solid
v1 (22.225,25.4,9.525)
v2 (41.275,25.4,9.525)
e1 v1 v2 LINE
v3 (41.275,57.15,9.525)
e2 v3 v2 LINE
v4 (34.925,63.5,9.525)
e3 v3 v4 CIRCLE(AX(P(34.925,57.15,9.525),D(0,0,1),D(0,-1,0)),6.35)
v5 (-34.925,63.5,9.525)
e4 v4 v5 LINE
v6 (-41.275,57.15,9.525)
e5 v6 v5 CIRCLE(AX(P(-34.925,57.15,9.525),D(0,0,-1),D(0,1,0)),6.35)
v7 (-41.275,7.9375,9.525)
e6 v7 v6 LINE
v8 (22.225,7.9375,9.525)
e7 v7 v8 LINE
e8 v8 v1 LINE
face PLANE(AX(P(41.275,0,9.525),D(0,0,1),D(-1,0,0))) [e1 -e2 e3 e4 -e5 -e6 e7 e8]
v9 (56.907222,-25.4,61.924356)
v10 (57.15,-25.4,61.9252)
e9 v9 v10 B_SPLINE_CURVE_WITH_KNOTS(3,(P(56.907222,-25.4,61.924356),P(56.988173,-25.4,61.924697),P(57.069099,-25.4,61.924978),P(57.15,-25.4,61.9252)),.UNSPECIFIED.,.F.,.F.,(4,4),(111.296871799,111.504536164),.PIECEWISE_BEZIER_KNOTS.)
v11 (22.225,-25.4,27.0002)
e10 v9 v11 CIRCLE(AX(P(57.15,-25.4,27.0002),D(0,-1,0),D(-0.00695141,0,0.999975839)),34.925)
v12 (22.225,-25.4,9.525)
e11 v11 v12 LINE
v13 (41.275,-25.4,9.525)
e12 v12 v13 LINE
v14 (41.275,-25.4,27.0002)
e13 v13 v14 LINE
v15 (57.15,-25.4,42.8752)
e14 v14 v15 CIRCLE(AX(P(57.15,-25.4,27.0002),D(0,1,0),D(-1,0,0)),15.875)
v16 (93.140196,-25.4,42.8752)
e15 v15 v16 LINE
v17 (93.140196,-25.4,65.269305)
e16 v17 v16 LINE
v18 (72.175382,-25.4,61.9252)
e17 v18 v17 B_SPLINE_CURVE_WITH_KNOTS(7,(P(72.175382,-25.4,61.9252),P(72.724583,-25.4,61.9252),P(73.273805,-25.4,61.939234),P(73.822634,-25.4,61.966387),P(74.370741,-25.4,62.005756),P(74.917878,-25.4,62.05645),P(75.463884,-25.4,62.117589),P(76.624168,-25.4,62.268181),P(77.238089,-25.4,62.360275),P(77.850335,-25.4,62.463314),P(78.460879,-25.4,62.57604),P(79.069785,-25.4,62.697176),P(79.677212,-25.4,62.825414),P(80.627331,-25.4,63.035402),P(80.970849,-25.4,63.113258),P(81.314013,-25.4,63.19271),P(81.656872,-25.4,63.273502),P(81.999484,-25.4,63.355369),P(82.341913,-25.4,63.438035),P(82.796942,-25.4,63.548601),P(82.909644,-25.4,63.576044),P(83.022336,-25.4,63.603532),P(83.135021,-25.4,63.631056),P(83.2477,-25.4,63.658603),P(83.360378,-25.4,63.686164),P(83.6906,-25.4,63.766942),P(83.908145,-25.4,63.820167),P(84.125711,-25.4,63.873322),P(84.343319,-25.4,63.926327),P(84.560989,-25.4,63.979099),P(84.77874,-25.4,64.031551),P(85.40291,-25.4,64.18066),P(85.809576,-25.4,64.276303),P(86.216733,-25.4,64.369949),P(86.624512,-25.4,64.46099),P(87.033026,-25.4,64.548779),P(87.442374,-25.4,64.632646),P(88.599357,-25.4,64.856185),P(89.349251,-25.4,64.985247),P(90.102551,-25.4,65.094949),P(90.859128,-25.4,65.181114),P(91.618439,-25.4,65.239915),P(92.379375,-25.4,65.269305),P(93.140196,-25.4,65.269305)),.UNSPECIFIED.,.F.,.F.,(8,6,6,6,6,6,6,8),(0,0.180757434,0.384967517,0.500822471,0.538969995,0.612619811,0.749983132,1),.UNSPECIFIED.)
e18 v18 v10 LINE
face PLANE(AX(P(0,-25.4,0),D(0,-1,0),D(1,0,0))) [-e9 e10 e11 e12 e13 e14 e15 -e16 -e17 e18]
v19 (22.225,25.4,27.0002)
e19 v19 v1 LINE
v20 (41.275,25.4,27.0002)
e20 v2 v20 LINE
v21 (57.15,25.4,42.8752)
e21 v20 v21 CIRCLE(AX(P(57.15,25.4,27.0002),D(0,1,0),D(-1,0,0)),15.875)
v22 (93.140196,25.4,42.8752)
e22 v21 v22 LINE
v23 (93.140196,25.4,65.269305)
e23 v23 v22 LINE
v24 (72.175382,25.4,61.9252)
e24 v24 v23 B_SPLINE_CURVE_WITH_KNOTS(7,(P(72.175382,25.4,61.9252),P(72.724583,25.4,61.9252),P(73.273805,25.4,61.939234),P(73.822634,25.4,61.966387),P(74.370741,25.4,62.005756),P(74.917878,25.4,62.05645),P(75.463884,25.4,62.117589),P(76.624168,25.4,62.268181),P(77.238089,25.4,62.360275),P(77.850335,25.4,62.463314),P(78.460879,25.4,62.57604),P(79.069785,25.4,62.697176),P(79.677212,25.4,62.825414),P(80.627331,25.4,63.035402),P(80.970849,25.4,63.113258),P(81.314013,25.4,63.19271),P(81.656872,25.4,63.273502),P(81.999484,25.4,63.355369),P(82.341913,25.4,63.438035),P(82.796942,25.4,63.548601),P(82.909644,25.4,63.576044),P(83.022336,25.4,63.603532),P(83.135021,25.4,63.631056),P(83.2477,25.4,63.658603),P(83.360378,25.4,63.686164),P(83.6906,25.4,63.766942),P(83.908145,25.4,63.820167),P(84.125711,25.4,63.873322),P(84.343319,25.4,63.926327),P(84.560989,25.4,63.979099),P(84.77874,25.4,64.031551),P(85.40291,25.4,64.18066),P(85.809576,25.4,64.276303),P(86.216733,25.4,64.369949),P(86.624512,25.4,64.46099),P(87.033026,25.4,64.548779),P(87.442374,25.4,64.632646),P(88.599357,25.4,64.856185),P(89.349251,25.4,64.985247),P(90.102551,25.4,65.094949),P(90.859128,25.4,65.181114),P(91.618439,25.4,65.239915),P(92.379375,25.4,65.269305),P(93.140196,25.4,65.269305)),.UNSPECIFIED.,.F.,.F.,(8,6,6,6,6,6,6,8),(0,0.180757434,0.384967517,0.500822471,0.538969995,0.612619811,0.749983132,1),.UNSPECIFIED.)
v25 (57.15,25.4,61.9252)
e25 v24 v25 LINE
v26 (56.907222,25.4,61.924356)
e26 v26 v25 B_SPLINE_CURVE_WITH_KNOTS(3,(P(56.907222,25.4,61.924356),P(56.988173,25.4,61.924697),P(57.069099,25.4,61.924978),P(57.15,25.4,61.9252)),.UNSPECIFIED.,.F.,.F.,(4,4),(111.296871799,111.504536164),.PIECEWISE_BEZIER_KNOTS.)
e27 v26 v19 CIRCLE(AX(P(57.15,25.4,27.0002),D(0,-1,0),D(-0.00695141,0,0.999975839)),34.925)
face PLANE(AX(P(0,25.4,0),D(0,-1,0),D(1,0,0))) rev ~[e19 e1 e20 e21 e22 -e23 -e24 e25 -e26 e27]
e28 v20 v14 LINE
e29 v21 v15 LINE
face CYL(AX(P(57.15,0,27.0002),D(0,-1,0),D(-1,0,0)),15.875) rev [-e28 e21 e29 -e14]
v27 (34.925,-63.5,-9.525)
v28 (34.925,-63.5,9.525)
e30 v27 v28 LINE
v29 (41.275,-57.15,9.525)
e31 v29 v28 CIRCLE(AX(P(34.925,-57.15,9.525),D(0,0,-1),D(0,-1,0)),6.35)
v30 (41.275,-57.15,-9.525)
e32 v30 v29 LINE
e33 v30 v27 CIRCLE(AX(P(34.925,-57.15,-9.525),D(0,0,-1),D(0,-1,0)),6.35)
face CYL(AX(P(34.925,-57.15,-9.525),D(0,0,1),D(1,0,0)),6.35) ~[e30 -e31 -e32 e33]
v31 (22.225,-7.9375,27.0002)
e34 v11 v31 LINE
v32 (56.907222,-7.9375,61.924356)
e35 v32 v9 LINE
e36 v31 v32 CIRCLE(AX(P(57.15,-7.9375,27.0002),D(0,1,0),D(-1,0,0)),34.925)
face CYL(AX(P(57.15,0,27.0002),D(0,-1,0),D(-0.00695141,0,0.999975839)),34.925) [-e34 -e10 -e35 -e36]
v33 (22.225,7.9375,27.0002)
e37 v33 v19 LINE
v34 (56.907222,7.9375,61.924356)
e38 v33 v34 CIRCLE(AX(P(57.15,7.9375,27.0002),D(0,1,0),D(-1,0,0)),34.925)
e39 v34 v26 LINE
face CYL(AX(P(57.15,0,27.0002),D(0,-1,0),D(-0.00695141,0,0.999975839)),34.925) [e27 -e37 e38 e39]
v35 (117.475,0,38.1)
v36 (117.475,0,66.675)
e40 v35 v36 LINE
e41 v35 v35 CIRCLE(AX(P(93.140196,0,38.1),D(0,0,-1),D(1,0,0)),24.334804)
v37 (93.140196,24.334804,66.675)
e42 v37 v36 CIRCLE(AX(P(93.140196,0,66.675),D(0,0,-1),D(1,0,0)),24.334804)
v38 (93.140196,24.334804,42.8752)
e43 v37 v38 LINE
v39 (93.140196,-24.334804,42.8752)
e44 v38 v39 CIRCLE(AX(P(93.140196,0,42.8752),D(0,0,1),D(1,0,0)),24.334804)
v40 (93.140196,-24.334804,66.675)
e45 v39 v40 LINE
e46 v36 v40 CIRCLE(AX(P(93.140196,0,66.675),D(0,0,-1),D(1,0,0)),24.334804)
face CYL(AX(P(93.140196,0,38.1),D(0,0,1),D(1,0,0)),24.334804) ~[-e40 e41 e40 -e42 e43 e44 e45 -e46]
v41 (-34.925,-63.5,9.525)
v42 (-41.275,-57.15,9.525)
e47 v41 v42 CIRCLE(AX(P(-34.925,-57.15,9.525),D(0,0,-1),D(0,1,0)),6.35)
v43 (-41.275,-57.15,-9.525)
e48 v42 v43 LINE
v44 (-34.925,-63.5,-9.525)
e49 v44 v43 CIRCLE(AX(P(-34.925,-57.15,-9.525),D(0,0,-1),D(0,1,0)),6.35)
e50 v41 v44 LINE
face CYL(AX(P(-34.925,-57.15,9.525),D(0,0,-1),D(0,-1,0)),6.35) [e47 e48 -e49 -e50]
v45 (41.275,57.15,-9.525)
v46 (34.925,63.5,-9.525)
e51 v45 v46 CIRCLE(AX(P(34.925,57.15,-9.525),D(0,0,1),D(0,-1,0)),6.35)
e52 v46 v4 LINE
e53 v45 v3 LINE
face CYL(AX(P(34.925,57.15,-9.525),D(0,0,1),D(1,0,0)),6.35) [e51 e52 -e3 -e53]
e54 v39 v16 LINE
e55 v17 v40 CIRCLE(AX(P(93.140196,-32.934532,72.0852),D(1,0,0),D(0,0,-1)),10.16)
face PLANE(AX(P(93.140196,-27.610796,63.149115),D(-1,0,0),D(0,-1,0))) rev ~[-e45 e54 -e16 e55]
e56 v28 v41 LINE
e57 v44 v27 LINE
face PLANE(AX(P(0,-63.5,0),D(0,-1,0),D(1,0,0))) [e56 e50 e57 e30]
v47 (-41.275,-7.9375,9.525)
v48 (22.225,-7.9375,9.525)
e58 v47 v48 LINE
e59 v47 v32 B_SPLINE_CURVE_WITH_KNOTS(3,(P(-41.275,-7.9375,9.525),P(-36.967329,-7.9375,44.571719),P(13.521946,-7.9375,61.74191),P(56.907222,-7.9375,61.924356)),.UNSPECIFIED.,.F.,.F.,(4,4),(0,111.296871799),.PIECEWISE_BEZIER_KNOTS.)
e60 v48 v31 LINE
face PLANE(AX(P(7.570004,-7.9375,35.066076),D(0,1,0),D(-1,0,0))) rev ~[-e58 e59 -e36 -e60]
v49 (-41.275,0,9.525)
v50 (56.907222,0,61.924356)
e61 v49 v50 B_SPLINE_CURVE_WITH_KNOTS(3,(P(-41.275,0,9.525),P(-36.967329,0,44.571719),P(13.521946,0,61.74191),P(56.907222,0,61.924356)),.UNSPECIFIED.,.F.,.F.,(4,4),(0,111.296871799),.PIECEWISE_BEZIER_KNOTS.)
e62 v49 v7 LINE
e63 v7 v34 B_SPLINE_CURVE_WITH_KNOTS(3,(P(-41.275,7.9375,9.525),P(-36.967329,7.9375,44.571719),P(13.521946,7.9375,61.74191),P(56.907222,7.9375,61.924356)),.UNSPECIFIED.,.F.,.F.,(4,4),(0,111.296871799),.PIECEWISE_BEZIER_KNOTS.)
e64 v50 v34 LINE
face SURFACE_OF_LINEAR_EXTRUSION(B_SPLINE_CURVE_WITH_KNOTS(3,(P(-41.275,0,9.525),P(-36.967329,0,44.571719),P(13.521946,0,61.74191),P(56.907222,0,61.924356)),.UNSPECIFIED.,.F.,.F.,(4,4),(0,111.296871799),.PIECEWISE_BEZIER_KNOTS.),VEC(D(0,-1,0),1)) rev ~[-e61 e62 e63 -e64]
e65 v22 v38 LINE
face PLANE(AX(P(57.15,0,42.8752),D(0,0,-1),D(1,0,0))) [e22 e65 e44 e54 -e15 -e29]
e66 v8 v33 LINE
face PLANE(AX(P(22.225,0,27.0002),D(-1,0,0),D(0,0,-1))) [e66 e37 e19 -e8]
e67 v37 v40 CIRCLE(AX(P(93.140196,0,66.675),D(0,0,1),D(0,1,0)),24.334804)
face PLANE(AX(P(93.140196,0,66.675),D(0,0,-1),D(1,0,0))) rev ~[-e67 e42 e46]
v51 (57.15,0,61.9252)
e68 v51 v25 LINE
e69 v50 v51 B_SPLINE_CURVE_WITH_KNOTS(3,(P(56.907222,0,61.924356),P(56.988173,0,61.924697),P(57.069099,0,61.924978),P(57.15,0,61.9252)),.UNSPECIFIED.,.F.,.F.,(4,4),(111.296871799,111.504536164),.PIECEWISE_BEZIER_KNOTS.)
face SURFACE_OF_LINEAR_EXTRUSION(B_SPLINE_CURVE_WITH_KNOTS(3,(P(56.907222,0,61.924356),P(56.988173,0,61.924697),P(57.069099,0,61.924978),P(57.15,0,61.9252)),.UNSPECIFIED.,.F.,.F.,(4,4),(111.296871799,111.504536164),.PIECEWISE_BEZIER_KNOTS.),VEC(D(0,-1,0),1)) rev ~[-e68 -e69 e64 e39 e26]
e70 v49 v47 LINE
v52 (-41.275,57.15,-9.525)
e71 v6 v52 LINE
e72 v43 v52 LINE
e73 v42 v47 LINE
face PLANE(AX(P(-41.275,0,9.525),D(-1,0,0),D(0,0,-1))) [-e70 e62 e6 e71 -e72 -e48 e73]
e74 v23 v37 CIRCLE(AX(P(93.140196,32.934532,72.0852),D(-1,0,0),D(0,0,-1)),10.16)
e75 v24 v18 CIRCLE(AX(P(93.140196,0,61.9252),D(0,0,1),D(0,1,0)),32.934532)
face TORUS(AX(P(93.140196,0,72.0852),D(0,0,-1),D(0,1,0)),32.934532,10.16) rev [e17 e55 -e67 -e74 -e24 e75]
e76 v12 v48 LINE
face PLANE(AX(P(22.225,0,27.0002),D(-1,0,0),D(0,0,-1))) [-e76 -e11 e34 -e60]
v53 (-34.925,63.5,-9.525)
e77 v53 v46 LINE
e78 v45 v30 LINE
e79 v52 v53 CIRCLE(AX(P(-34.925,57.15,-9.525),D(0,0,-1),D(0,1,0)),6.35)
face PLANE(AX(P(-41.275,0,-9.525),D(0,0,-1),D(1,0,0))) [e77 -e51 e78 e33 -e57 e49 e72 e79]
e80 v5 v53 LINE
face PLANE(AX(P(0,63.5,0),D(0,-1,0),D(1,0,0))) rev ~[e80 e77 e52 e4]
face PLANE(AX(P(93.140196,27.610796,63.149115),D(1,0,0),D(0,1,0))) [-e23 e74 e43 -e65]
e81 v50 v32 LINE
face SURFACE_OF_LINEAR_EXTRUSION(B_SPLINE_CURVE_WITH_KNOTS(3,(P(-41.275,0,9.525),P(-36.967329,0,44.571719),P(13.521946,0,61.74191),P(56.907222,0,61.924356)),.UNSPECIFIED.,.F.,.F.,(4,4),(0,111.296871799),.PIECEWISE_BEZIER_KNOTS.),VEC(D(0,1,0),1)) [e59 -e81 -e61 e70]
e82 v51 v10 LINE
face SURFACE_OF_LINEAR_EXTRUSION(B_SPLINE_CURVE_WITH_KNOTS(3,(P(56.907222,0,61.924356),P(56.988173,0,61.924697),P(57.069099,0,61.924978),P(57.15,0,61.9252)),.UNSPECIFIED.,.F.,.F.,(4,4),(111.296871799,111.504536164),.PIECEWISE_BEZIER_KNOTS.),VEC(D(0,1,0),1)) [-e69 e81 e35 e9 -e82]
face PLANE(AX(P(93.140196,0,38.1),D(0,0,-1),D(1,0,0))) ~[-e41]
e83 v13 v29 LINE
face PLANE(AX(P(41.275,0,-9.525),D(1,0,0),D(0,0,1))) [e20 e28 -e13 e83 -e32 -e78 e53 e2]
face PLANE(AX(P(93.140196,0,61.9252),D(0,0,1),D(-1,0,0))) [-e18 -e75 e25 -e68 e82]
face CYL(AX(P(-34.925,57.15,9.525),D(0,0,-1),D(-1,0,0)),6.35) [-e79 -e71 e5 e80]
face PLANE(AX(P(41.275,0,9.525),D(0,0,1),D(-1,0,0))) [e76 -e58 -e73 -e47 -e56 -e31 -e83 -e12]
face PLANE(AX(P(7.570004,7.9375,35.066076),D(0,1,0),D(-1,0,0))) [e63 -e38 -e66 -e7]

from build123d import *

# Parameters (mm, degrees)
F1_DEPTH    = 63.5
F0_W        = 26.465196414
F0_H        = 19.05
F2_DEPTH    = 25.4
F3_DEPTH    = 7.9375
F5_R        = 6.35
F6_T4_ANGLE = 180


# Not quite as in the source:
# - a fillet or chamfer that OpenCascade refuses, or shapes differently, is made with other operations: its cross-section is extruded or revolved along the edge and cut away or added


with BuildPart() as f1:
    # F0 (on Front) → F1 (new body, symmetric)
    with BuildSketch(Plane.XZ):
        Polygon((-41.275, -9.525), (41.275, -9.525), (41.275, 9.525), (22.225, 9.525), (-41.275, 9.525), align=None)
    extrude(amount=F1_DEPTH, both=True)

    # F0 (on Front) → F2 (join, symmetric)
    with BuildSketch(Plane.XZ):
        with BuildLine():
            Line((22.225, 9.525), (41.275, 9.525))
            Line((41.275, 9.525), (41.275, 27.0002))
            ThreePointArc((41.275, 27.0002), (45.9246798487, 38.2255201513), (57.15, 42.8752))
            Line((57.15, 42.8752), (66.675, 42.8752))
            Line((66.675, 42.8752), (66.675, 61.9252))
            Line((66.675, 61.9252), (57.15, 61.9252))
            add(Edge.make_bspline(
                [(56.9072220114, 61.9243561652), (56.9881728551, 61.9246965832), (57.0690989666, 61.9249778596), (57.15, 61.9252)],
                knots=[111.2968717992, 111.2968717992, 111.2968717992, 111.2968717992, 111.5045361635, 111.5045361635, 111.5045361635, 111.5045361635], degree=3))
            ThreePointArc((56.9072220114, 61.9243561652), (32.3686093383, 51.6099196626), (22.225, 27.0002))
            Line((22.225, 27.0002), (22.225, 9.525))
        make_face()
        with Locations((79.907598207, 52.4002)):
            Rectangle(F0_W, F0_H)
    extrude(amount=F2_DEPTH, both=True)

    # F0 (on Front) → F3 (join, symmetric)
    with BuildSketch(Plane.XZ):
        with BuildLine():
            add(Edge.make_bspline(
                [(-41.275, 9.525), (-36.9673291938, 44.5717190185), (13.5219464317, 61.7419104925), (56.9072220114, 61.9243561652)],
                knots=[0, 0, 0, 0, 111.2968717992, 111.2968717992, 111.2968717992, 111.2968717992], degree=3))
            Line((-41.275, 9.525), (22.225, 9.525))
            Line((22.225, 9.525), (22.225, 27.0002))
            ThreePointArc((22.225, 27.0002), (32.3686093383, 51.6099196626), (56.9072220114, 61.9243561652))
        make_face()
    extrude(amount=F3_DEPTH, both=True)

    # F0 (on Front) → F4 (revolve)
    with BuildSketch(Plane.XZ):
        Polygon((93.140196414, 61.9252), (93.140196414, 42.8752), (93.140196414, 38.1), (117.475, 38.1), (117.475, 66.675), (93.140196414, 66.675), align=None)
    revolve(axis=Axis((93.140196414, 0, 52.3875), (0, 0, -1)))

    # F5
    f5_edges = [f1.edges().sort_by_distance(p)[0] for p in [
        (-41.275, 63.5, 0),
        (-41.275, -63.5, 0),
        (41.275, -63.5, 0),
        (41.275, 63.5, 0),
    ]]
    fillet(f5_edges, radius=F5_R)

    # F6: fillet of radius 10.16 on 1 edges, made by hand


with BuildPart() as f6_tool2:
    # F6_s3 → F6_t4 (revolve)
    with BuildSketch(Plane.YZ.offset(93.140196414)):
        with BuildLine():
            ThreePointArc((32.9345324166, 61.9252), (28.0224061967, 63.1915721688), (24.334803586, 66.675))
            Line((24.334803586, 66.675), (24.334803586, 61.9252))
            Line((24.334803586, 61.9252), (32.9345324166, 61.9252))
        make_face()
    revolve(axis=Axis((93.140196414, 0, 61.9252), (0, 0, 1)), revolution_arc=F6_T4_ANGLE)

    split(bisect_by=Plane.XZ.offset(-25.4), keep=Keep.TOP)

    split(bisect_by=Plane.XZ.offset(25.4), keep=Keep.BOTTOM)


with BuildPart() as f1_1:
    add(f1.part)

    # F6_t1: union F6_tool2
    add(f6_tool2.part)


solid = f1_1.part
